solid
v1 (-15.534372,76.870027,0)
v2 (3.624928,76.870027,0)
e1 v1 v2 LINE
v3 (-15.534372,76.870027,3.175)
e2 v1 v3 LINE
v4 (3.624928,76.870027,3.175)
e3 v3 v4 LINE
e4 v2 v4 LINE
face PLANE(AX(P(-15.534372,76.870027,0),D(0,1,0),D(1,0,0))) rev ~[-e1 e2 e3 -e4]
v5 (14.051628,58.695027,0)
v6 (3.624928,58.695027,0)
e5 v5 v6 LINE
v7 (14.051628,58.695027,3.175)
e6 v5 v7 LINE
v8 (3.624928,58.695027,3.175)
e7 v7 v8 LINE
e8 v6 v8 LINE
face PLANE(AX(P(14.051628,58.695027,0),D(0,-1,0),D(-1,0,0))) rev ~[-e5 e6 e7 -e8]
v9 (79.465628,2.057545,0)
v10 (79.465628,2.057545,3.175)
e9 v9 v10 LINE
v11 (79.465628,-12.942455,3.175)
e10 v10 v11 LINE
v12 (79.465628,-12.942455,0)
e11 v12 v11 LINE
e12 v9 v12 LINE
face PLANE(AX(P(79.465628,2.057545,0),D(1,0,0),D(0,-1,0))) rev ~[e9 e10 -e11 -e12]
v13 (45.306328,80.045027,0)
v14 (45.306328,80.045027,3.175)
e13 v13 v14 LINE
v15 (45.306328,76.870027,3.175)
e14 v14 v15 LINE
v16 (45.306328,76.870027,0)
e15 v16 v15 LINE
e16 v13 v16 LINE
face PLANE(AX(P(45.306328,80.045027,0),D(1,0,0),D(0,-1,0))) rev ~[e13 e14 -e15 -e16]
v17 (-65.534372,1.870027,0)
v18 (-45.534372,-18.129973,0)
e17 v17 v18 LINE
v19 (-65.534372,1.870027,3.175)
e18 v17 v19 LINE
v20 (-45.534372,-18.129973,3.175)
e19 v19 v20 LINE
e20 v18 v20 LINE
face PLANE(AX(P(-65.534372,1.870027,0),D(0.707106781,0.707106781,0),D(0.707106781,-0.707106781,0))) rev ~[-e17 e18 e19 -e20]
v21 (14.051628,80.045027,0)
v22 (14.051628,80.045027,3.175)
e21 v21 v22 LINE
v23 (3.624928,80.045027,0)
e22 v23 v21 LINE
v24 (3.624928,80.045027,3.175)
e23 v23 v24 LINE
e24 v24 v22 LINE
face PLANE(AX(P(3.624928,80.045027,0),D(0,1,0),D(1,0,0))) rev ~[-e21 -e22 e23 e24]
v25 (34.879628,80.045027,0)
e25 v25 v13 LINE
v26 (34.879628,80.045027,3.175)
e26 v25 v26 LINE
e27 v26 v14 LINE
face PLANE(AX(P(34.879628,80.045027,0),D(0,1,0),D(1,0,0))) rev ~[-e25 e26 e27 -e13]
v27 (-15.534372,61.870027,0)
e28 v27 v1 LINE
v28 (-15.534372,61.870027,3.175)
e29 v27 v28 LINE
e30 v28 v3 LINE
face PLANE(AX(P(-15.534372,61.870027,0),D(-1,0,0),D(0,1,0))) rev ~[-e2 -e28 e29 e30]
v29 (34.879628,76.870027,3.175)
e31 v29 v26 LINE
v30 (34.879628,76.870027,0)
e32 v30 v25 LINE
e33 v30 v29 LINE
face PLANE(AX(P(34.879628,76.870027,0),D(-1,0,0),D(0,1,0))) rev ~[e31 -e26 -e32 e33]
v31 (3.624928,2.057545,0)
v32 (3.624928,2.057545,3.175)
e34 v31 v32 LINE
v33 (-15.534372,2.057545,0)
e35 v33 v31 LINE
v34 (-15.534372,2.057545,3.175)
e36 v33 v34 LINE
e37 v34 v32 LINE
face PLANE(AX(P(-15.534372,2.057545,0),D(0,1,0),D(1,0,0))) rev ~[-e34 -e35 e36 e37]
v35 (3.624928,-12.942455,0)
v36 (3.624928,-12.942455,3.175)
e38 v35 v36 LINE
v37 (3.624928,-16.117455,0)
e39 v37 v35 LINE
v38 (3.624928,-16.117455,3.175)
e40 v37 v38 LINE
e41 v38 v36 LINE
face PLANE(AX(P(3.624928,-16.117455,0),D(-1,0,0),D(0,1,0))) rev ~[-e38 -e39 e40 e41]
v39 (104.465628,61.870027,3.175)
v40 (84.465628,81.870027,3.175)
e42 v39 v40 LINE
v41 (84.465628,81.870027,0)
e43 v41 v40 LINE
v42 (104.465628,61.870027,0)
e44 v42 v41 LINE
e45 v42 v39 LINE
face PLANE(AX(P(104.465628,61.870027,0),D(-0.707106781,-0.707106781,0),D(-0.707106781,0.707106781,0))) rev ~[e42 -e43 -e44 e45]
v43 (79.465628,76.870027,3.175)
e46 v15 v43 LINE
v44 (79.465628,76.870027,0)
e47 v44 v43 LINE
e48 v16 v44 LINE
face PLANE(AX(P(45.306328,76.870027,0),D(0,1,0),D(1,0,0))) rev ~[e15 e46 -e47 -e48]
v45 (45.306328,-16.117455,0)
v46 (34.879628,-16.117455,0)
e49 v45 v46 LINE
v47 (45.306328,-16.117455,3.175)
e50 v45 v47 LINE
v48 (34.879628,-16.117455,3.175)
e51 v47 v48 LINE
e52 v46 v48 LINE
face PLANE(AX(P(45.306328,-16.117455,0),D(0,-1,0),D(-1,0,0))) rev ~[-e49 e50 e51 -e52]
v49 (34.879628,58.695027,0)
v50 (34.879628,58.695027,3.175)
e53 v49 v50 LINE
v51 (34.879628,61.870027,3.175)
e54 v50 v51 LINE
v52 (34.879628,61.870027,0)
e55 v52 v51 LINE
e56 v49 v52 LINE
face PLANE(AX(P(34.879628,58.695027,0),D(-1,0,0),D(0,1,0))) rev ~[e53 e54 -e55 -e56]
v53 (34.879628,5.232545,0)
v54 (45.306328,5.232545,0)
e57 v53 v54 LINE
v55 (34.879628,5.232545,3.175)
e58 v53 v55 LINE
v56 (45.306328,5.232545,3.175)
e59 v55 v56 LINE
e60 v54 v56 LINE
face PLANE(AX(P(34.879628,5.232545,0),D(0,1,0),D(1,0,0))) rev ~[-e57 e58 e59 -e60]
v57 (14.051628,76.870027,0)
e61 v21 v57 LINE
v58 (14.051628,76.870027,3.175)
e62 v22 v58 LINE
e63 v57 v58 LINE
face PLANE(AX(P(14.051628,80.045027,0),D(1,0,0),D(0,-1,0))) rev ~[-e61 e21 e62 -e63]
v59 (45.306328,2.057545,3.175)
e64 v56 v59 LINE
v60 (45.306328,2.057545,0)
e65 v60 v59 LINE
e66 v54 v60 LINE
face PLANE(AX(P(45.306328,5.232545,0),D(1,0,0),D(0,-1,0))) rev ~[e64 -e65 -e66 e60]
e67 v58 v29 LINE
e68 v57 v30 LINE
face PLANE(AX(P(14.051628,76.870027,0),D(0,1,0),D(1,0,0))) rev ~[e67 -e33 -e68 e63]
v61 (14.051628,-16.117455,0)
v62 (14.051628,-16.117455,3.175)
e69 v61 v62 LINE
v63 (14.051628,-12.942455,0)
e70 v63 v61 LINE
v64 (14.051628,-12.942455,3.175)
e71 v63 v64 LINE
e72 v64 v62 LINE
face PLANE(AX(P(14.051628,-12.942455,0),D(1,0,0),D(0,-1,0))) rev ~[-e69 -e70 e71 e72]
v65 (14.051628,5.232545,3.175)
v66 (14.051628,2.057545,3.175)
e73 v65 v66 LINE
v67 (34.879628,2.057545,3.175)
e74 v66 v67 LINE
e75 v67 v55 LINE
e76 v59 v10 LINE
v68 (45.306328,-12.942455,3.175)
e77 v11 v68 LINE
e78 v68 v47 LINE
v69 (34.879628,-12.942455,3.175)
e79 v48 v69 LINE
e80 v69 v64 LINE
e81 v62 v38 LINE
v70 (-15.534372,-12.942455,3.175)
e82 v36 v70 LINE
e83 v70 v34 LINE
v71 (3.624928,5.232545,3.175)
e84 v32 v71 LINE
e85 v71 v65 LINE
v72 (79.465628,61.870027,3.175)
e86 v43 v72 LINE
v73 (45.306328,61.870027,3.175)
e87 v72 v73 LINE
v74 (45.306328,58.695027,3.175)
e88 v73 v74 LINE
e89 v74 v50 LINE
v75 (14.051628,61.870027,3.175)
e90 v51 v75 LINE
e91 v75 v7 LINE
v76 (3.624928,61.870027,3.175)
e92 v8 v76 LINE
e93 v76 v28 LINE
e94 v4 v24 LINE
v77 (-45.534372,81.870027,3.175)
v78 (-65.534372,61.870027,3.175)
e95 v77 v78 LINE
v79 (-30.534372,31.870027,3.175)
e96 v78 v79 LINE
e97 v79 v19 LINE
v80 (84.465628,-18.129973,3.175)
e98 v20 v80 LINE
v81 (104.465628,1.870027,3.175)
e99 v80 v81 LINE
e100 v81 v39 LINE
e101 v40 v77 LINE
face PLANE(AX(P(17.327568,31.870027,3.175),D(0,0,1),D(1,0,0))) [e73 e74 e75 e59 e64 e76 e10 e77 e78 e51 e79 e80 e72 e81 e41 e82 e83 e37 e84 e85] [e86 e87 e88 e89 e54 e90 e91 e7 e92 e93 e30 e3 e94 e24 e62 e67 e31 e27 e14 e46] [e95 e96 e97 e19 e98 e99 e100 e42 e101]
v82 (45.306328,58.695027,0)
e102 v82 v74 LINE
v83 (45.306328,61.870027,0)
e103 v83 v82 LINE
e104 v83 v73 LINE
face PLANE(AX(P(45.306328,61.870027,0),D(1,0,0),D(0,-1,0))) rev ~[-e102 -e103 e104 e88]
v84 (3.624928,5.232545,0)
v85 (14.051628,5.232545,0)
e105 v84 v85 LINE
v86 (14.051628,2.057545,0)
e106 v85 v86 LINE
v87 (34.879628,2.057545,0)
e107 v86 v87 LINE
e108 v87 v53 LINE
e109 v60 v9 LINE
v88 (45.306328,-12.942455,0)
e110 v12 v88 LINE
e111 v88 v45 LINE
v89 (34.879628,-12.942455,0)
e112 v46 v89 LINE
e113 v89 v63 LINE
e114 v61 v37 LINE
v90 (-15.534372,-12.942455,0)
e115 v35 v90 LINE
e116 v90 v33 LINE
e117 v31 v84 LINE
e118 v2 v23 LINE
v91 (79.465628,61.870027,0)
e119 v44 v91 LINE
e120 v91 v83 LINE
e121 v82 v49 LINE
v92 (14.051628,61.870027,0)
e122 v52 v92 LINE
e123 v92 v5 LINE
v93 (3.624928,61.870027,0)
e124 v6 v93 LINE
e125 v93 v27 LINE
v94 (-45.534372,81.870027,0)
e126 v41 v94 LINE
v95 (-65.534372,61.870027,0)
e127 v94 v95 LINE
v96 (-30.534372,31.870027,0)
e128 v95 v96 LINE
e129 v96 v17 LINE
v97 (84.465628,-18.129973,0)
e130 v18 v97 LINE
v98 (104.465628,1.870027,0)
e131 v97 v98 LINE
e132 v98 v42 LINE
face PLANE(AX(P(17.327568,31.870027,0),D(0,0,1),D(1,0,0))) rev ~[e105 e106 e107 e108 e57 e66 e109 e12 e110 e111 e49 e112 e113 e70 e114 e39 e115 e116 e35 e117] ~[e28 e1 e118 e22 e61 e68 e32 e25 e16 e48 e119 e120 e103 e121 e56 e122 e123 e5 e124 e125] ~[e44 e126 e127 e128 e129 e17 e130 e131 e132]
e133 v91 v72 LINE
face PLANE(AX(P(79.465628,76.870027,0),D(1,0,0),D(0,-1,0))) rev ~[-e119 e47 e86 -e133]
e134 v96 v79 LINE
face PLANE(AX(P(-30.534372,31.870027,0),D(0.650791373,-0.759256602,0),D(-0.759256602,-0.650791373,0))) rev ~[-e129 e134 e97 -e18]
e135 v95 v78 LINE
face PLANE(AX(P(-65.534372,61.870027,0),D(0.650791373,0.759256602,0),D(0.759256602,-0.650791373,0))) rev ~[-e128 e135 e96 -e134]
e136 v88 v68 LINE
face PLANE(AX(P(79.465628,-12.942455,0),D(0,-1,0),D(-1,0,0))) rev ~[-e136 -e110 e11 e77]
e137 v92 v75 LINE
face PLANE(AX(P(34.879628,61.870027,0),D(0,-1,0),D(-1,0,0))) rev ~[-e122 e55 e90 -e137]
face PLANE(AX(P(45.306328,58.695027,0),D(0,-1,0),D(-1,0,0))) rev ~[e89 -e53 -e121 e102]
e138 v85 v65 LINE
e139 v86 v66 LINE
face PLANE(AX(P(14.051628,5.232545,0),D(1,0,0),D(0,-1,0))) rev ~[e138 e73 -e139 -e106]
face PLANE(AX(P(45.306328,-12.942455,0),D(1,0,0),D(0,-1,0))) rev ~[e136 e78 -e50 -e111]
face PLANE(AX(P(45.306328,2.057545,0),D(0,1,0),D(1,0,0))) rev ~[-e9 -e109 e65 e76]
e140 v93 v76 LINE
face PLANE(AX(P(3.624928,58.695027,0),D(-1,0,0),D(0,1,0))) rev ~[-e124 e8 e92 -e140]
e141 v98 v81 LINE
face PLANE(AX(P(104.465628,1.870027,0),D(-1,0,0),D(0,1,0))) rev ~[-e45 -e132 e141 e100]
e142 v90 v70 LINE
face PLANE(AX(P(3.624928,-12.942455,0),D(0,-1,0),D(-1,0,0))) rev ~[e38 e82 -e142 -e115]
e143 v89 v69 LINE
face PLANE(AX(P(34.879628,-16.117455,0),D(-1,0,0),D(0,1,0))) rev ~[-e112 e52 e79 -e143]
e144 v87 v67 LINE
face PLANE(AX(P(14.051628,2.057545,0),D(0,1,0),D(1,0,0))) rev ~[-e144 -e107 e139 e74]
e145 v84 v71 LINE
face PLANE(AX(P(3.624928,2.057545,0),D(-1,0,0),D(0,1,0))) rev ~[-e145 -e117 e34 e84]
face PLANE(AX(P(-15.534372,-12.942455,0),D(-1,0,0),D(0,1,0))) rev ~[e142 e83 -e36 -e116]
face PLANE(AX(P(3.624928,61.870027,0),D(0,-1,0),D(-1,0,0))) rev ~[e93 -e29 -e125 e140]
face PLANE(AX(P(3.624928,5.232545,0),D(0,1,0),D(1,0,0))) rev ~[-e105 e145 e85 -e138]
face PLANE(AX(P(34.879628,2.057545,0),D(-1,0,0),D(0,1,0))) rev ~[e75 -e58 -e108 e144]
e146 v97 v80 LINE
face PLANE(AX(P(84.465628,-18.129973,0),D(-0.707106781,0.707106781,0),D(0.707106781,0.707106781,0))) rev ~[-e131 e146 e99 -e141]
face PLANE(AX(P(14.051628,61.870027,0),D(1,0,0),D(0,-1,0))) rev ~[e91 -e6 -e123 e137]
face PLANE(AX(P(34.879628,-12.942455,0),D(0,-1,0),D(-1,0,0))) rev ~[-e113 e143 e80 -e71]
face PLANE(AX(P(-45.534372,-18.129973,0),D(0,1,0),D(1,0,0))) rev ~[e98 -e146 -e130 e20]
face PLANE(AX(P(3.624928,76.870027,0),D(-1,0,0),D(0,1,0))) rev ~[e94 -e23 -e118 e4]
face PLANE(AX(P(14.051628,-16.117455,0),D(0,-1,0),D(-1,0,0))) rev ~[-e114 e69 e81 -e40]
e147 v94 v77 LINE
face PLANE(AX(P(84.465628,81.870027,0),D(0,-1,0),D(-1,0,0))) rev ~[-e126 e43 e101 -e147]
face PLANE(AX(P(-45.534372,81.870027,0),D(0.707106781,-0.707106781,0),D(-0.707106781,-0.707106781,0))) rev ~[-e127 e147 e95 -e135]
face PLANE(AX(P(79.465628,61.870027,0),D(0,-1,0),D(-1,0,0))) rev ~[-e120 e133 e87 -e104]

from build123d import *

# Parameters (mm, degrees)
F1_DEPTH = 3.175


# Not quite as in the source:
# - a length typed as a fraction of an inch, garbled in the dataset ("3 / 203.2 mm" for 3/8 in), is restored


with BuildPart() as f1:
    # F0 (on Top) → F1 (new body)
    with BuildSketch(Plane.XY):
        Polygon((84.4656275958, 81.8700266516), (-45.5343724042, 81.8700266516), (-65.5343724042, 61.8700266516), (-30.5343724042, 31.8700266516), (-65.5343724042, 1.8700266516), (-45.5343724042, -18.1299733484), (84.4656275958, -18.1299733484), (104.4656275958, 1.8700266516), (104.4656275958, 61.8700266516), align=None)
        Polygon((-15.5343724042, -12.9424554378), (-15.5343724042, 2.0575445622), (3.6249275958, 2.0575445622), (3.6249275958, 5.2325445622), (14.0516275958, 5.2325445622), (14.0516275958, 2.0575445622), (34.8796275958, 2.0575445622), (34.8796275958, 5.2325445622), (45.3063275958, 5.2325445622), (45.3063275958, 2.0575445622), (64.4656275958, 2.0575445622), (74.4656275958, 2.0575445622), (79.4656275958, 2.0575445622), (79.4656275958, -12.9424554378), (74.4656275958, -12.9424554378), (64.4656275958, -12.9424554378), (45.3063275958, -12.9424554378), (45.3063275958, -16.1174554378), (34.8796275958, -16.1174554378), (34.8796275958, -12.9424554378), (14.0516275958, -12.9424554378), (14.0516275958, -16.1174554378), (3.6249275958, -16.1174554378), (3.6249275958, -12.9424554378), align=None, mode=Mode.SUBTRACT)
        Polygon((-15.5343724042, 61.8700266516), (-15.5343724042, 76.8700266516), (3.6249275958, 76.8700266516), (3.6249275958, 80.0450266516), (14.0516275958, 80.0450266516), (14.0516275958, 76.8700266516), (34.8796275958, 76.8700266516), (34.8796275958, 80.0450266516), (45.3063275958, 80.0450266516), (45.3063275958, 76.8700266516), (64.4656275958, 76.8700266516), (74.4656275958, 76.8700266516), (79.4656275958, 76.8700266516), (79.4656275958, 61.8700266516), (74.4656275958, 61.8700266516), (64.4656275958, 61.8700266516), (45.3063275958, 61.8700266516), (45.3063275958, 58.6950266516), (34.8796275958, 58.6950266516), (34.8796275958, 61.8700266516), (14.0516275958, 61.8700266516), (14.0516275958, 58.6950266516), (3.6249275958, 58.6950266516), (3.6249275958, 61.8700266516), align=None, mode=Mode.SUBTRACT)
    extrude(amount=F1_DEPTH)


solid = f1.part
